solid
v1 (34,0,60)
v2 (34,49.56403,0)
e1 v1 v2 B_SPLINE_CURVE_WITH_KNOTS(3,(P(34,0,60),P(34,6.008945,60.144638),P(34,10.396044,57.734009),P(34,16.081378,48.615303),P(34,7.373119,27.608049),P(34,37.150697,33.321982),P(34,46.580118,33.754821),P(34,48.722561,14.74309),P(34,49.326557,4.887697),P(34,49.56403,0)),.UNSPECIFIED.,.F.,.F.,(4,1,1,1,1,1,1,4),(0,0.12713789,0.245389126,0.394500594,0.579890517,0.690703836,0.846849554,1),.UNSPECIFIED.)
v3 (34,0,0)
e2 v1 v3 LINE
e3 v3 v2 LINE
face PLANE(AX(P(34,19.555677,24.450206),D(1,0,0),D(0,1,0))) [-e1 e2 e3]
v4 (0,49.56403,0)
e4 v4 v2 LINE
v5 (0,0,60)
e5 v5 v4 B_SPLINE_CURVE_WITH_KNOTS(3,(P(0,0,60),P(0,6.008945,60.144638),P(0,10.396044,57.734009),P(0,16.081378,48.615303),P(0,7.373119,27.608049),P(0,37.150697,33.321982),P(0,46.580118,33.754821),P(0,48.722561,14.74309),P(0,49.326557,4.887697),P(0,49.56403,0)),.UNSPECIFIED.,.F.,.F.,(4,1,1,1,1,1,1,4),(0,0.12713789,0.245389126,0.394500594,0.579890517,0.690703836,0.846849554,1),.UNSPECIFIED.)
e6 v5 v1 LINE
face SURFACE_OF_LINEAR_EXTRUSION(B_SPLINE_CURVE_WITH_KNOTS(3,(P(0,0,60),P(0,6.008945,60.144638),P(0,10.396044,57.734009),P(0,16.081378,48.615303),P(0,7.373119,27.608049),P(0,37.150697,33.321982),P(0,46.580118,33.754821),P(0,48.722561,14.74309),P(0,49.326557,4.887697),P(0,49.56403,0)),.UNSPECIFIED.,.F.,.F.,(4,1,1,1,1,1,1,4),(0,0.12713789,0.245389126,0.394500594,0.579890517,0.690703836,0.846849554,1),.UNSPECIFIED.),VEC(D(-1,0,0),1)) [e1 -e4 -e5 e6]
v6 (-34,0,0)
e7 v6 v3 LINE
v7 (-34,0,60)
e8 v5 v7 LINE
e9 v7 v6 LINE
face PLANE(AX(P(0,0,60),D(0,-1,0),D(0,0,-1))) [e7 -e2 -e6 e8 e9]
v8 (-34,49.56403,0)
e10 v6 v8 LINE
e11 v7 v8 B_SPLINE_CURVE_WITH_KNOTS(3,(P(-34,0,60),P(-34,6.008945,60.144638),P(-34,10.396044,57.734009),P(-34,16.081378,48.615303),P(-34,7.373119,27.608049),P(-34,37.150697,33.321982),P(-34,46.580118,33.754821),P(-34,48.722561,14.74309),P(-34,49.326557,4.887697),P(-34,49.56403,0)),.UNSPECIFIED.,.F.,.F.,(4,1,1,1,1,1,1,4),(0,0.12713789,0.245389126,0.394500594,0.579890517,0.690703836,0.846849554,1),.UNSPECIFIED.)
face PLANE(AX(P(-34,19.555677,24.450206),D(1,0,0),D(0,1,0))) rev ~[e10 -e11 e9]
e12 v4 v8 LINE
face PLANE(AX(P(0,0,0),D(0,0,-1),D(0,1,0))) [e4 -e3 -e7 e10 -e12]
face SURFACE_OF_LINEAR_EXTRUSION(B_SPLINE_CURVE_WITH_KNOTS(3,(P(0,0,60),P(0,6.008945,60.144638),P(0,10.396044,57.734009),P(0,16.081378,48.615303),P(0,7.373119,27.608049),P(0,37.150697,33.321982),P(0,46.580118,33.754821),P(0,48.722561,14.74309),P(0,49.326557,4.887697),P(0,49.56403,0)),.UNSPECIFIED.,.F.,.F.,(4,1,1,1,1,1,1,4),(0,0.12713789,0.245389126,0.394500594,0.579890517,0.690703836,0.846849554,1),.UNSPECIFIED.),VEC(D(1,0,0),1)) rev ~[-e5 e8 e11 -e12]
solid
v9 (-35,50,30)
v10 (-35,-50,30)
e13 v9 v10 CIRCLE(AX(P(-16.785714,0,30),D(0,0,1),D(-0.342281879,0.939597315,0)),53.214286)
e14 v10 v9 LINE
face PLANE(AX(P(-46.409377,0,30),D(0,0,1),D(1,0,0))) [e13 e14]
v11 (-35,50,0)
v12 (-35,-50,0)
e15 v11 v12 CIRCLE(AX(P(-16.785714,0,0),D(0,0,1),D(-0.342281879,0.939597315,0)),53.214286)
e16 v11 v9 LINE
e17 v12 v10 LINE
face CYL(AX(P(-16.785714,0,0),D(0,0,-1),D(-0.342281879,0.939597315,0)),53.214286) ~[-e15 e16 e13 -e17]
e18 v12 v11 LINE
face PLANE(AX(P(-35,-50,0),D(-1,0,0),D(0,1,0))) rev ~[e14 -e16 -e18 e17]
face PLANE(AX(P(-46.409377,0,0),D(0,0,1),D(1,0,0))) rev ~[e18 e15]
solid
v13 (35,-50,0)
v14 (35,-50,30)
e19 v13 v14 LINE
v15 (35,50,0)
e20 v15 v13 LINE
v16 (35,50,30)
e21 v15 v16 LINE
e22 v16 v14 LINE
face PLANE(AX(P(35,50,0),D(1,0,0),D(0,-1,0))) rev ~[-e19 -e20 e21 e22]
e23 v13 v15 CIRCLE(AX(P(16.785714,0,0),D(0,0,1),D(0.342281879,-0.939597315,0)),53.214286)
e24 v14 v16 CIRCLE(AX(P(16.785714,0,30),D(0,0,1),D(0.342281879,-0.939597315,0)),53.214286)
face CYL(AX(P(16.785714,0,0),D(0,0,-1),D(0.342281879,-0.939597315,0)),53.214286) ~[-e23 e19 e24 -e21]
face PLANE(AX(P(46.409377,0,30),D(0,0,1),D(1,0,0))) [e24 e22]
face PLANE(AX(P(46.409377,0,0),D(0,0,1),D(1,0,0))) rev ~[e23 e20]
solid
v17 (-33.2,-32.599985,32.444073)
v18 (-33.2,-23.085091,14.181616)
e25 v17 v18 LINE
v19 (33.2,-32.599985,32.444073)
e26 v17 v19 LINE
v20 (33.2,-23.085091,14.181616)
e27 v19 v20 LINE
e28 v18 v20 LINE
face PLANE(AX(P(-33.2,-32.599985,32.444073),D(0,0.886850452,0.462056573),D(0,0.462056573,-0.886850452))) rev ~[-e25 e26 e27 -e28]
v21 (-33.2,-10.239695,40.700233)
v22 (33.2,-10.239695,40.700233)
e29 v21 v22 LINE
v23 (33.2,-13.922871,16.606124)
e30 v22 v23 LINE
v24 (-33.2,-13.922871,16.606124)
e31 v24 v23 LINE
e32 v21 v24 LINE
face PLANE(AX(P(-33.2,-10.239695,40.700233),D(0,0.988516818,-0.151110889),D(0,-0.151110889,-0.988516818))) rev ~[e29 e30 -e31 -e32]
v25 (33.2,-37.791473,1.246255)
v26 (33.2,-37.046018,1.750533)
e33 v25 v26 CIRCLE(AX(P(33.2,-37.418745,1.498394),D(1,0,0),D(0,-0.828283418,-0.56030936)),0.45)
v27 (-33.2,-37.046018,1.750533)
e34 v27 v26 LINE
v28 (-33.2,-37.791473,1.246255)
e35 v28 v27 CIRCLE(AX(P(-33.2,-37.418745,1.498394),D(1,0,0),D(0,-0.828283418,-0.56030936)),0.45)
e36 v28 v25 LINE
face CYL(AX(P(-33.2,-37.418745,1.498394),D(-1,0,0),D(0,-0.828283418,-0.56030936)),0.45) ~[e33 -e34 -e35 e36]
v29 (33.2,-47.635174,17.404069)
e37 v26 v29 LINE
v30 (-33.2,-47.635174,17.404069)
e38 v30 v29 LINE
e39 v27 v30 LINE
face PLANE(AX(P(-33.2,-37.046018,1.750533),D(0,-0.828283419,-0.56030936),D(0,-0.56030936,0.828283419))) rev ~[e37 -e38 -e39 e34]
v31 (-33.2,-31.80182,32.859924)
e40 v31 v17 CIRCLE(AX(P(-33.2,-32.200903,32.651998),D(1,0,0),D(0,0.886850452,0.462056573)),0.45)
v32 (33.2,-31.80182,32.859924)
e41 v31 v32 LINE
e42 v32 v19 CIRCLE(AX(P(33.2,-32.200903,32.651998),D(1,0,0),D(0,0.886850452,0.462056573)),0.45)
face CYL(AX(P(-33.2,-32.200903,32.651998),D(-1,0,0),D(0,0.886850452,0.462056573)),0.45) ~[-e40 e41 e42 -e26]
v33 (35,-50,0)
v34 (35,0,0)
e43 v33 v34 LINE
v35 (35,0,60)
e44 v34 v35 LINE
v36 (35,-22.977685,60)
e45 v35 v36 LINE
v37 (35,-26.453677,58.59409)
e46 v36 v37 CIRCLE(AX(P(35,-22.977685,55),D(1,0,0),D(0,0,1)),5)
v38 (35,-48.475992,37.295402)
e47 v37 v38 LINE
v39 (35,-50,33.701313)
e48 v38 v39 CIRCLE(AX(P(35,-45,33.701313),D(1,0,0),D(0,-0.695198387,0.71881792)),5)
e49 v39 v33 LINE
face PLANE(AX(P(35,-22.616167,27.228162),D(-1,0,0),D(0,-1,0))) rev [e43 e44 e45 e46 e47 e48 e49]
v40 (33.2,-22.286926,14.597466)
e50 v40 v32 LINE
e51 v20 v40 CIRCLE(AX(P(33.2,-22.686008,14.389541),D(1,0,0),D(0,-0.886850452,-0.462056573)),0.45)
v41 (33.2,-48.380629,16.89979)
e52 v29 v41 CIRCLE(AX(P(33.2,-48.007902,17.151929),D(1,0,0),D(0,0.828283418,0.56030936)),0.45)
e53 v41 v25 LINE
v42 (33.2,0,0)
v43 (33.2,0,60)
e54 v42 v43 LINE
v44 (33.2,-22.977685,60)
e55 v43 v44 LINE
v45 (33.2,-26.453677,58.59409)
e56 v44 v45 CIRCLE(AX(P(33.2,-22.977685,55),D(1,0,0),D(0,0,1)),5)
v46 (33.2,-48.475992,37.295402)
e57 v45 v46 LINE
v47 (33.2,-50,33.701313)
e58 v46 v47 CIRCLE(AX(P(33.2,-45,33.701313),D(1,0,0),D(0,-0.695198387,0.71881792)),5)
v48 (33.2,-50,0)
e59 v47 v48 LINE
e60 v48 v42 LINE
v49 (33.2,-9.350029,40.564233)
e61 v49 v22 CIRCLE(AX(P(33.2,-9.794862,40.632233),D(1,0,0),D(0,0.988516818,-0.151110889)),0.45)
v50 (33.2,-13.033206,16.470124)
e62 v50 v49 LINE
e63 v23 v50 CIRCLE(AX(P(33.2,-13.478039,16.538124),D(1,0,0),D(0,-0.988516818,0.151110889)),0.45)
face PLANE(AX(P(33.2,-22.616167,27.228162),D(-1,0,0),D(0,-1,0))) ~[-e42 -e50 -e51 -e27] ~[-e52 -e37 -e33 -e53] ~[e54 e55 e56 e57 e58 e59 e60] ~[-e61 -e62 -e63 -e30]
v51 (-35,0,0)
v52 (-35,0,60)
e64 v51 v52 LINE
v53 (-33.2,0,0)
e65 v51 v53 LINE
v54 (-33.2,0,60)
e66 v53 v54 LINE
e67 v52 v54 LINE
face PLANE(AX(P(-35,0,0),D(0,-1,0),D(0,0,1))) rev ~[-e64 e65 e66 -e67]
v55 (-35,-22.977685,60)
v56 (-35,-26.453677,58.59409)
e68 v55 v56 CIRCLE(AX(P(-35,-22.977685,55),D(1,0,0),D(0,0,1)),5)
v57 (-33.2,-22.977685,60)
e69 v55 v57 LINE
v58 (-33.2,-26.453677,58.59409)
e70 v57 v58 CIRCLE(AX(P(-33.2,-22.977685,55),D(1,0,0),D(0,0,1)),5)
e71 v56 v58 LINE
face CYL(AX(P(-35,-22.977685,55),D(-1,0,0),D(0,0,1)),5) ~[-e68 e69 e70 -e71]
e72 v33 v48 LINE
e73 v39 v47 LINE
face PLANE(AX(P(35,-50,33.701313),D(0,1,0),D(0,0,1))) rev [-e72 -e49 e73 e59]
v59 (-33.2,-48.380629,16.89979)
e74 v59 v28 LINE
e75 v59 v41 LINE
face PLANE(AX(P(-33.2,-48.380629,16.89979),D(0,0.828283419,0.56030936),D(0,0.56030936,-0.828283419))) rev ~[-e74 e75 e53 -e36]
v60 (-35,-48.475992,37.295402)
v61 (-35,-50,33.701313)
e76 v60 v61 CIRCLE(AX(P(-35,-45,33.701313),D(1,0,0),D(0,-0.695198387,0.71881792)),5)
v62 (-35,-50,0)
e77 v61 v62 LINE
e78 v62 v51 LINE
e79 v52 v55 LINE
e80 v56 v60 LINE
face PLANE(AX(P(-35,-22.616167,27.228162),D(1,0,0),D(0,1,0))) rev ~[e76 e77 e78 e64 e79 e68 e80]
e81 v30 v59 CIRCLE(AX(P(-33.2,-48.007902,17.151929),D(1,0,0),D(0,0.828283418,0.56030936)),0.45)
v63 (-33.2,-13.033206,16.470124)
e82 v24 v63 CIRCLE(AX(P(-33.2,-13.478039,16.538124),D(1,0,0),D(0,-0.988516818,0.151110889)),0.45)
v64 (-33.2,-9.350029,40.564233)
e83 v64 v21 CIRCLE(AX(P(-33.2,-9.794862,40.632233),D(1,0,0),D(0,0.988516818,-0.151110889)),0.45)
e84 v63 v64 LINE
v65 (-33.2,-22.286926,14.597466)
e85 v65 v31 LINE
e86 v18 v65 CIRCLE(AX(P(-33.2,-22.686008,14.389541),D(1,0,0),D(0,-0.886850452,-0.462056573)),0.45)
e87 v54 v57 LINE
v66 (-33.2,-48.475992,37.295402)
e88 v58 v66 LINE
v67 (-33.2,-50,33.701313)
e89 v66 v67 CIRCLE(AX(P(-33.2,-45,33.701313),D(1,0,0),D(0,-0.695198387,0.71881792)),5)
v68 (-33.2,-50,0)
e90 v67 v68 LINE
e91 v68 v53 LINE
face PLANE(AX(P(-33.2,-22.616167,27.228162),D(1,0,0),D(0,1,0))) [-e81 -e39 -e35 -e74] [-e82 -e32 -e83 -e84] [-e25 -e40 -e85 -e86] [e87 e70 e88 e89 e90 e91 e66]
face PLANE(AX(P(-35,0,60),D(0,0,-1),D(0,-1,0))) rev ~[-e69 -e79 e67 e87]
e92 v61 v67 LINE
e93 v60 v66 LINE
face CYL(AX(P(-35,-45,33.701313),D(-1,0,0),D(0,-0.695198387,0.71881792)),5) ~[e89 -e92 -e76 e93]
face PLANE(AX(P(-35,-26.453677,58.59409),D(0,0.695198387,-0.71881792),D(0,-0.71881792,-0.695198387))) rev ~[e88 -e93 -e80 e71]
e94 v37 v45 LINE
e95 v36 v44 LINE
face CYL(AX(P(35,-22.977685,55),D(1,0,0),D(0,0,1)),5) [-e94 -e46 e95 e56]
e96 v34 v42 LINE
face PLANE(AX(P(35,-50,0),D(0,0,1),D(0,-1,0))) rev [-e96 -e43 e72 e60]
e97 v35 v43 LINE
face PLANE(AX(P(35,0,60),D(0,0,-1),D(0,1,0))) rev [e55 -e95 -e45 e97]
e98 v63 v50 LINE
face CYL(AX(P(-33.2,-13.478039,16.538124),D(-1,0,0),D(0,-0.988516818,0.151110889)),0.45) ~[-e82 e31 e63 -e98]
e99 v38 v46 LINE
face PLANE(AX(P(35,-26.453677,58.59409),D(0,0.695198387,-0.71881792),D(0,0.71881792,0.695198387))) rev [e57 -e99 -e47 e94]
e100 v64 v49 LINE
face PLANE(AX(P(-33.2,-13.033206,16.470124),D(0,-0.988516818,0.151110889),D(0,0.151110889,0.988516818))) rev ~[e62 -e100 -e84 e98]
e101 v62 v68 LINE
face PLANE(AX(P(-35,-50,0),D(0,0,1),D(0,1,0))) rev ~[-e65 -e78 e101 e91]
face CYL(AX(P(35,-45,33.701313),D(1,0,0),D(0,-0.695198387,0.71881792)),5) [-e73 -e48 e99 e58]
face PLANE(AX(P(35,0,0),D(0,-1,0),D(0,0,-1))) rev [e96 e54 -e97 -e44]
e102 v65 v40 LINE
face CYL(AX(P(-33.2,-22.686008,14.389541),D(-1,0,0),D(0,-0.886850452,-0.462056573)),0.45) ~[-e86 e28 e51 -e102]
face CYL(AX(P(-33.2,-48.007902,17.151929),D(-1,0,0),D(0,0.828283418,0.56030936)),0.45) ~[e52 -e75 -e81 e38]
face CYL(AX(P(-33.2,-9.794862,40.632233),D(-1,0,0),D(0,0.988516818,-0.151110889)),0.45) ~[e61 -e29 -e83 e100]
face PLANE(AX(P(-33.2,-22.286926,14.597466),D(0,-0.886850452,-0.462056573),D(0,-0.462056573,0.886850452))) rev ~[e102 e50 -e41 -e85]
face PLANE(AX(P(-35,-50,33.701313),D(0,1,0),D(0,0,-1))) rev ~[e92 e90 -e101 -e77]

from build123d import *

# Parameters (mm, degrees)
F1_DEPTH      = 30
F3_DEPTH      = 34
F3_DEPTH_BACK = 34
F5_DEPTH      = 1.8
F8_DEPTH      = 66.4


with BuildPart() as f1:
    # F0 (on Top) → F1 (new body)
    with BuildSketch(Plane.XY):
        with BuildLine():
            Line((-35, -50), (-35, 50))
            ThreePointArc((-35, 50), (-70, 0), (-35, -50))
        make_face()
    extrude(amount=F1_DEPTH)


with BuildPart() as f1b:
    # F0 (on Top) → F1, piece 2 (new body)
    with BuildSketch(Plane.XY):
        with BuildLine():
            ThreePointArc((35, -50), (70, 0), (35, 50))
            Line((35, 50), (35, -50))
        make_face()
    extrude(amount=F1_DEPTH)


with BuildPart() as f3:
    # F2 (on Right) → F3 (new body, two sides)
    with BuildSketch(Plane.YZ) as f3_sk:
        with BuildLine():
            Line((0, 60), (0, 0))
            Line((0, 0), (49.5640300214, 0))
            add(Edge.make_bspline(
                [(0, 60), (6.0089451636, 60.144637794), (10.3960435461, 57.7340089425), (16.0813784265, 48.6153030742), (7.373119025, 27.6080491003), (37.1506971717, 33.3219817547), (46.5801176583, 33.7548207857), (48.7225614629, 14.7430900128), (49.3265567032, 4.8876965388), (49.5640300214, 0)],
                knots=[0, 0, 0, 0, 0.1271378904, 0.2453891259, 0.3945005936, 0.5798905169, 0.6907038362, 0.8468495544, 1, 1, 1, 1], degree=3))
        make_face()
    extrude(amount=F3_DEPTH)
    extrude(f3_sk.sketch, amount=-F3_DEPTH_BACK)


with BuildPart() as f5:
    # F4 (on face) → F5 (new body)
    with BuildSketch(Plane.YZ.offset(-35)):
        with BuildLine():
            Line((-50, 0), (0, 0))
            Line((0, 0), (0, 60))
            Line((0, 60), (-22.977684609, 60))
            ThreePointArc((-22.977684609, 60), (-24.8524581938, 59.6352156374), (-26.4536765438, 58.5940896022))
            Line((-26.4536765438, 58.5940896022), (-48.4759919348, 37.2954022692))
            ThreePointArc((-48.4759919348, 37.2954022692), (-49.6032575245, 35.6532399614), (-50, 33.7013126669))
            Line((-50, 33.7013126669), (-50, 0))
        make_face()
    extrude(amount=F5_DEPTH)


with BuildPart() as f6_1:
    # F6: instance of F5
    add(f5.part.mirror(Plane.YZ))


with BuildPart() as f5_1:
    add(f5.part)

    add(f6_1.part)  # F8 merges F6_1
    # F7 (on face) → F8 (join, through all)
    with BuildSketch(Plane.YZ.offset(-33.2)):
        with BuildLine():
            ThreePointArc((-31.8018199972, 32.8599235604), (-32.4088281582, 33.0510808059), (-32.5999854037, 32.4440726449))
            Line((-32.5999854037, 32.4440726449), (-23.0850910672, 14.1816155424))
            ThreePointArc((-23.0850910672, 14.1816155424), (-22.4780829062, 13.9904582969), (-22.2869256607, 14.5974664579))
            Line((-22.2869256607, 14.5974664579), (-31.8018199972, 32.8599235604))
        make_face()
        with BuildLine():
            ThreePointArc((-47.6351742196, 17.40406865), (-48.2600409698, 17.5246569764), (-48.3806292963, 16.8997902262))
            Line((-48.3806292963, 16.8997902262), (-37.7914729965, 1.2462545025))
            ThreePointArc((-37.7914729965, 1.2462545025), (-37.1666062462, 1.1256661761), (-37.0460179198, 1.7505329263))
            Line((-37.0460179198, 1.7505329263), (-47.6351742196, 17.40406865))
        make_face()
        with BuildLine():
            ThreePointArc((-9.3500294415, 40.5642331237), (-9.7268621096, 41.0770655917), (-10.2396945776, 40.7002329236))
            Line((-10.2396945776, 40.7002329236), (-13.9228713829, 16.6061240042))
            ThreePointArc((-13.9228713829, 16.6061240042), (-13.5460387148, 16.0932915362), (-13.0332062468, 16.4701242042))
            Line((-13.0332062468, 16.4701242042), (-9.3500294415, 40.5642331237))
        make_face()
    extrude(amount=F8_DEPTH)


solid = Compound([f1.part, f1b.part, f3.part, f5_1.part])
